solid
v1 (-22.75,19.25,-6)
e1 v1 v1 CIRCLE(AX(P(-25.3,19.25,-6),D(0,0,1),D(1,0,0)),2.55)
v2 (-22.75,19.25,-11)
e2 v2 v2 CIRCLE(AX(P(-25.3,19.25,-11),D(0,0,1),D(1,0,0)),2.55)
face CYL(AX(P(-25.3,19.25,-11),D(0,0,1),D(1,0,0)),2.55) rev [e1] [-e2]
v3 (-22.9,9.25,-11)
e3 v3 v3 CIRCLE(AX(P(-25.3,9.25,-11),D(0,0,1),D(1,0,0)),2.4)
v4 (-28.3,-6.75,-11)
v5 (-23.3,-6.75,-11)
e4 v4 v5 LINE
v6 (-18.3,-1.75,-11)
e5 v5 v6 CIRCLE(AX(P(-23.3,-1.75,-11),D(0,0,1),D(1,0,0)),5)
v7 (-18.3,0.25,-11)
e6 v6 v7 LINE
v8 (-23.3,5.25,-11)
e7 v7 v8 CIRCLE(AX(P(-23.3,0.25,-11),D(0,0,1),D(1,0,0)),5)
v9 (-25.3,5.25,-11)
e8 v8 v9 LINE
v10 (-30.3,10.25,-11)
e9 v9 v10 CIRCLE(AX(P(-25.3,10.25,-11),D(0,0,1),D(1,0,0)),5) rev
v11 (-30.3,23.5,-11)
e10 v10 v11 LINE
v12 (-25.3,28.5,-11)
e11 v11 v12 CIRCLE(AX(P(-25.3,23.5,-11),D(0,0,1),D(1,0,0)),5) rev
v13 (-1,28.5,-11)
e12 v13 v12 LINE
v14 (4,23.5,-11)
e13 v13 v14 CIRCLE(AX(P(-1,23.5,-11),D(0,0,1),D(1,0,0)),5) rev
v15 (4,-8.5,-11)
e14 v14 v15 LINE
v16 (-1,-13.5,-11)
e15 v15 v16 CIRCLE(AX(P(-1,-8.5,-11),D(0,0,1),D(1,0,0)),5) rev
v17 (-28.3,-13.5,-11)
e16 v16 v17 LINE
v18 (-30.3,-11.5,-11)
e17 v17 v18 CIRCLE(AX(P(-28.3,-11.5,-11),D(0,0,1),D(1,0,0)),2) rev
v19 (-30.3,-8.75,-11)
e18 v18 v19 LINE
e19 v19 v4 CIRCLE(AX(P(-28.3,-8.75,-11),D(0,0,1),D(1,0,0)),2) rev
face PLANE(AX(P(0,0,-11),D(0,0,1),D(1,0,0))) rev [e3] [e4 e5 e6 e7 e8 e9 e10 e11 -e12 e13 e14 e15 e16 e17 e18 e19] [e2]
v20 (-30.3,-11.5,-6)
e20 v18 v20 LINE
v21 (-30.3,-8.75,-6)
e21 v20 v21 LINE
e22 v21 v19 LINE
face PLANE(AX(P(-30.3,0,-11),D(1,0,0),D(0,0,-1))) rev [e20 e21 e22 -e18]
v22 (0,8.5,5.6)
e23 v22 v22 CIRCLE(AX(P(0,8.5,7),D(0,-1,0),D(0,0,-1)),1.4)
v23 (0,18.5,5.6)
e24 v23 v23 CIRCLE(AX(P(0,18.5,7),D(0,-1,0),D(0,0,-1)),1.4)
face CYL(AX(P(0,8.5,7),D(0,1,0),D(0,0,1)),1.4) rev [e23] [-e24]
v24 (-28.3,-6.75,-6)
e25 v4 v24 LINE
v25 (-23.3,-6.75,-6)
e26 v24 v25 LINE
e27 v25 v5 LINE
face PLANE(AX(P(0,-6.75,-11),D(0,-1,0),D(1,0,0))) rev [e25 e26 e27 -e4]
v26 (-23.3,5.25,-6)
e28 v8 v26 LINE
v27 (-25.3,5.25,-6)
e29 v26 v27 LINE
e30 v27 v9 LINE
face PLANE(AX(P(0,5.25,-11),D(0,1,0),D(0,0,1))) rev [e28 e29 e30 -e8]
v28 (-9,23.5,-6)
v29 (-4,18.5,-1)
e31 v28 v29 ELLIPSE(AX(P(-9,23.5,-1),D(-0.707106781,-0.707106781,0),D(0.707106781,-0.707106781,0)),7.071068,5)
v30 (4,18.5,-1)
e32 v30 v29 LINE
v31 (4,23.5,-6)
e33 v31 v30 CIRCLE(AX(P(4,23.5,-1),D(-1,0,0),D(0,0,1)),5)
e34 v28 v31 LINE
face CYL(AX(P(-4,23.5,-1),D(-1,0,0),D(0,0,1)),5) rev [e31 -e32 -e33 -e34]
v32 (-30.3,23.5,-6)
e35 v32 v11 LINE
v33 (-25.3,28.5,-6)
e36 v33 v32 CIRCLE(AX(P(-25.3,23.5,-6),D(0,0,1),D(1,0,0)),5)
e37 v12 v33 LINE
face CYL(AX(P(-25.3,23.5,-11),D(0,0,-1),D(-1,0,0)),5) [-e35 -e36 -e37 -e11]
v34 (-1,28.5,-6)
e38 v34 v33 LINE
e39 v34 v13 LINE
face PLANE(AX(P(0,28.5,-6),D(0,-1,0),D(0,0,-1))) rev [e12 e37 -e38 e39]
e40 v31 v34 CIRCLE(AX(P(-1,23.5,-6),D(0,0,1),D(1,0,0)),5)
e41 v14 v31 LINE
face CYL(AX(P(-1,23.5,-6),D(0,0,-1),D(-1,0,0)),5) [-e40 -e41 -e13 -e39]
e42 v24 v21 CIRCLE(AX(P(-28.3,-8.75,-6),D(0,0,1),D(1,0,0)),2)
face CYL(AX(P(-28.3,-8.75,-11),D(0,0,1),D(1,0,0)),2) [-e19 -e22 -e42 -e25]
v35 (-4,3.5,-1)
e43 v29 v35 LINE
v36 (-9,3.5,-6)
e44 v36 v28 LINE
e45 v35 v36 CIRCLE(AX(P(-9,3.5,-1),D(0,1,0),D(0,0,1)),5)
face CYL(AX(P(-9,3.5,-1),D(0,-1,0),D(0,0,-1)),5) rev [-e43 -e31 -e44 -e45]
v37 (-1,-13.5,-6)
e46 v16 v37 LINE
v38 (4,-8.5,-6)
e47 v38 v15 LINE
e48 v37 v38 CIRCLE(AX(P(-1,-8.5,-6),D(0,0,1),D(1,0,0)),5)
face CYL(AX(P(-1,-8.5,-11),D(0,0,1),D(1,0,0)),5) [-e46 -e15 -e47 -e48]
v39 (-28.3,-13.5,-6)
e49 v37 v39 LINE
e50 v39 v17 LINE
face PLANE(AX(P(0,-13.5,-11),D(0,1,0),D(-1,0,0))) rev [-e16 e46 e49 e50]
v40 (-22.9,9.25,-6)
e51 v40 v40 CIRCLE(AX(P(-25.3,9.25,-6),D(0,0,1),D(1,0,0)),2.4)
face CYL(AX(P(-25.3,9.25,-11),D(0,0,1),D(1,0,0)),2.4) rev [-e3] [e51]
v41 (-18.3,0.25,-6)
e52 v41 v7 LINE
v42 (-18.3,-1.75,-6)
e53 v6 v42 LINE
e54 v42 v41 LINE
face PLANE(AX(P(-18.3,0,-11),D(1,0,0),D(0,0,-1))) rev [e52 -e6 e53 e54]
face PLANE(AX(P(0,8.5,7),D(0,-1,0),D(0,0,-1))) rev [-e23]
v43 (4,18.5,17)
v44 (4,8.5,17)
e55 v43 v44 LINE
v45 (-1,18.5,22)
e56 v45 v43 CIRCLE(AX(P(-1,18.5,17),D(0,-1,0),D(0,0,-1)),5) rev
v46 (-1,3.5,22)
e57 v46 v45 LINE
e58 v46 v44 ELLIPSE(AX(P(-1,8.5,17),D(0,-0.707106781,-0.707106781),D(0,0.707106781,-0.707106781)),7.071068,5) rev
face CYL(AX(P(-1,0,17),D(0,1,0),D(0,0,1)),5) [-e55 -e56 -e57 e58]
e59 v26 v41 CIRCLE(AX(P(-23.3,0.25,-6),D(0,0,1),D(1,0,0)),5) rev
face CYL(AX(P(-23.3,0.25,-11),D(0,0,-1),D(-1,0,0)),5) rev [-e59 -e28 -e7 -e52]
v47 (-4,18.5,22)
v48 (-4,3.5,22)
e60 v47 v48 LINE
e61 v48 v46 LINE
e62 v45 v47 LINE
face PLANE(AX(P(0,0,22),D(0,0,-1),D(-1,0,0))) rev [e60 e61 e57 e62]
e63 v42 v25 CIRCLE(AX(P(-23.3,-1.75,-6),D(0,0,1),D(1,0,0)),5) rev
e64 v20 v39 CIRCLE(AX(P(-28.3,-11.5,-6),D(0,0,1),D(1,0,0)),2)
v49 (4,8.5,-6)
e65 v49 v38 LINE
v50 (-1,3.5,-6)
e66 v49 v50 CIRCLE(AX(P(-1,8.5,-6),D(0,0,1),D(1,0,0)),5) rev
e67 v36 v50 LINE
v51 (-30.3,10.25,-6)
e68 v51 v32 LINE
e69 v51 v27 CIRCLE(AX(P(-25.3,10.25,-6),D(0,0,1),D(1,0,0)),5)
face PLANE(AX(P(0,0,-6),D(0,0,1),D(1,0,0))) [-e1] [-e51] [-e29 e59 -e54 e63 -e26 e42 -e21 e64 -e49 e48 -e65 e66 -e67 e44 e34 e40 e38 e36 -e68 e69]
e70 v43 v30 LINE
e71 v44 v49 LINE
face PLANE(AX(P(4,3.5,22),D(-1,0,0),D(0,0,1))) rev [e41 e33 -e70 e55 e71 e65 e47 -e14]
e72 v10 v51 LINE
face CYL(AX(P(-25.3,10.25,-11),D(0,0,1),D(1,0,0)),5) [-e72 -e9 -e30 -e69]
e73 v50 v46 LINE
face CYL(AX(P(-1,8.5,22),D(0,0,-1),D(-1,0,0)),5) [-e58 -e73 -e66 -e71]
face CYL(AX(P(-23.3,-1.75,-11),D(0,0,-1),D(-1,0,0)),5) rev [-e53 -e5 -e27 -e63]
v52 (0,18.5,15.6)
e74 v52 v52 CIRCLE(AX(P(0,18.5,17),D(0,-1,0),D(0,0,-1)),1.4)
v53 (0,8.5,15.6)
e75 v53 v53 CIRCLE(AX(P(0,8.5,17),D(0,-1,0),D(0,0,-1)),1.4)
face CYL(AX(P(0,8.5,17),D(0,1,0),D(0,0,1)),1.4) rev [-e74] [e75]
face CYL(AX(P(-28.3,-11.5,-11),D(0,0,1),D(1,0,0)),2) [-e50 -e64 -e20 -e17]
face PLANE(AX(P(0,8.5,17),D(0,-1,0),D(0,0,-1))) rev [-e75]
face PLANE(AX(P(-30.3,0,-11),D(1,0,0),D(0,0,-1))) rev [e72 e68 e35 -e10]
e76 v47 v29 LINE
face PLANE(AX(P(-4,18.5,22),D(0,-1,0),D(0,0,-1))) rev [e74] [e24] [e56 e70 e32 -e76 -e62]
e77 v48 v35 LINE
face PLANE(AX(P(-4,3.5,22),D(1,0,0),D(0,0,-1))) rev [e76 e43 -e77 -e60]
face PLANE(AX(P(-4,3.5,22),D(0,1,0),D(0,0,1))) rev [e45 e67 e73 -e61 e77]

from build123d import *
from OCP.BRepFilletAPI import BRepFilletAPI_MakeFillet

# Parameters (mm, degrees)
SKETCH1_W           = 8
SKETCH1_H           = 15
BOSS_EXTRUDE1_DEPTH = 22
CUT_EXTRUDE1_START  = 18.5
SKETCH2_R           = 1.4
CUT_EXTRUDE1_DEPTH  = 10
SKETCH3_W           = 8
SKETCH3_H           = 15
BOSS_EXTRUDE2_DEPTH = 6
BOSS_EXTRUDE3_START = -6
BOSS_EXTRUDE3_DEPTH = 5
BOSS_EXTRUDE4_START = -11
SKETCH5_W           = 34.3
SKETCH5_H           = 15
BOSS_EXTRUDE4_DEPTH = 5
SKETCH7_R           = 2.55
SKETCH7_R_2         = 2.4
CUT_EXTRUDE2_DEPTH  = 48.05677422
FILLET1_R           = 5
FILLET1_R_2         = 2


with BuildPart() as part:
    # Sketch1 → Boss-Extrude1 (new body)
    with BuildSketch(Plane.XY):
        with Locations((0, 11)):
            Rectangle(SKETCH1_W, SKETCH1_H)
    extrude(amount=BOSS_EXTRUDE1_DEPTH)

    # Sketch2 → Cut-Extrude1 (cut)
    with BuildSketch(Plane(origin=(0, 0, 0), x_dir=(1, 0, 0), z_dir=(0, 1, 0)).offset(CUT_EXTRUDE1_START)):
        with Locations(Location((0, -7, 0), (0, 0, 90))):
            Circle(SKETCH2_R)
        with Locations(Location((0, -17, 0), (0, 0, 90))):
            Circle(SKETCH2_R)
    extrude(amount=-CUT_EXTRUDE1_DEPTH, mode=Mode.SUBTRACT)

    # Sketch3 → Boss-Extrude2 (add)
    with BuildSketch(Plane.XY):
        with Locations((0, 11)):
            Rectangle(SKETCH3_W, SKETCH3_H)
    extrude(amount=-BOSS_EXTRUDE2_DEPTH)

    # Sketch4 → Boss-Extrude3 (add)
    with BuildSketch(Plane.XY.offset(BOSS_EXTRUDE3_START)):
        Polygon((-16, -13.5), (4, -13.5), (4, 13.5), (-30.3, 13.5), (-30.3, 5.25), (-18.3, 5.25), (-18.3, -6.75), (-30.3, -6.75), (-30.3, -13.5), align=None)
    extrude(amount=-BOSS_EXTRUDE3_DEPTH)

    # Sketch5 → Boss-Extrude4 (add)
    with BuildSketch(Plane.XY.offset(BOSS_EXTRUDE4_START)):
        with Locations((-13.15, 21)):
            Rectangle(SKETCH5_W, SKETCH5_H)
    extrude(amount=BOSS_EXTRUDE4_DEPTH)

    # Sketch7 → Cut-Extrude2 (cut, through all)
    with BuildSketch(Plane.XY):
        with Locations((-25.3, 19.25)):
            Circle(SKETCH7_R)
        with Locations((-25.3, 9.25)):
            Circle(SKETCH7_R_2)
    extrude(amount=-CUT_EXTRUDE2_DEPTH, mode=Mode.SUBTRACT)

    # Fillet1
    fillet1_edges_1 = [part.edges().sort_by_distance(p)[0] for p in [
        (-4, 11, -6),
        (0, 18.5, -6),
        (-18.3, -6.75, -8.5),
        (-18.3, 5.25, -8.5),
        (-30.3, 5.25, -8.5),
        (4, -13.5, -8.5),
        (4, 11, 22),
        (4, 28.5, -8.5),
        (-30.3, 28.5, -8.5),
        (4, 3.5, 8),
    ]]
    fillet1_edges_2 = [part.edges().sort_by_distance(p)[0] for p in [
        (-30.3, -6.75, -8.5),
        (-30.3, -13.5, -8.5),
    ]]
    fillet1 = BRepFilletAPI_MakeFillet(part.part.solid().wrapped)
    for e in fillet1_edges_1:
        fillet1.Add(FILLET1_R - 0.0001, e.wrapped)
    for e in fillet1_edges_2:
        fillet1.Add(FILLET1_R_2 - 0.0001, e.wrapped)
    add(Compound.cast(fillet1.Shape()), mode=Mode.REPLACE)  # a hair under: the kernel refuses the full size


solid = part.part
